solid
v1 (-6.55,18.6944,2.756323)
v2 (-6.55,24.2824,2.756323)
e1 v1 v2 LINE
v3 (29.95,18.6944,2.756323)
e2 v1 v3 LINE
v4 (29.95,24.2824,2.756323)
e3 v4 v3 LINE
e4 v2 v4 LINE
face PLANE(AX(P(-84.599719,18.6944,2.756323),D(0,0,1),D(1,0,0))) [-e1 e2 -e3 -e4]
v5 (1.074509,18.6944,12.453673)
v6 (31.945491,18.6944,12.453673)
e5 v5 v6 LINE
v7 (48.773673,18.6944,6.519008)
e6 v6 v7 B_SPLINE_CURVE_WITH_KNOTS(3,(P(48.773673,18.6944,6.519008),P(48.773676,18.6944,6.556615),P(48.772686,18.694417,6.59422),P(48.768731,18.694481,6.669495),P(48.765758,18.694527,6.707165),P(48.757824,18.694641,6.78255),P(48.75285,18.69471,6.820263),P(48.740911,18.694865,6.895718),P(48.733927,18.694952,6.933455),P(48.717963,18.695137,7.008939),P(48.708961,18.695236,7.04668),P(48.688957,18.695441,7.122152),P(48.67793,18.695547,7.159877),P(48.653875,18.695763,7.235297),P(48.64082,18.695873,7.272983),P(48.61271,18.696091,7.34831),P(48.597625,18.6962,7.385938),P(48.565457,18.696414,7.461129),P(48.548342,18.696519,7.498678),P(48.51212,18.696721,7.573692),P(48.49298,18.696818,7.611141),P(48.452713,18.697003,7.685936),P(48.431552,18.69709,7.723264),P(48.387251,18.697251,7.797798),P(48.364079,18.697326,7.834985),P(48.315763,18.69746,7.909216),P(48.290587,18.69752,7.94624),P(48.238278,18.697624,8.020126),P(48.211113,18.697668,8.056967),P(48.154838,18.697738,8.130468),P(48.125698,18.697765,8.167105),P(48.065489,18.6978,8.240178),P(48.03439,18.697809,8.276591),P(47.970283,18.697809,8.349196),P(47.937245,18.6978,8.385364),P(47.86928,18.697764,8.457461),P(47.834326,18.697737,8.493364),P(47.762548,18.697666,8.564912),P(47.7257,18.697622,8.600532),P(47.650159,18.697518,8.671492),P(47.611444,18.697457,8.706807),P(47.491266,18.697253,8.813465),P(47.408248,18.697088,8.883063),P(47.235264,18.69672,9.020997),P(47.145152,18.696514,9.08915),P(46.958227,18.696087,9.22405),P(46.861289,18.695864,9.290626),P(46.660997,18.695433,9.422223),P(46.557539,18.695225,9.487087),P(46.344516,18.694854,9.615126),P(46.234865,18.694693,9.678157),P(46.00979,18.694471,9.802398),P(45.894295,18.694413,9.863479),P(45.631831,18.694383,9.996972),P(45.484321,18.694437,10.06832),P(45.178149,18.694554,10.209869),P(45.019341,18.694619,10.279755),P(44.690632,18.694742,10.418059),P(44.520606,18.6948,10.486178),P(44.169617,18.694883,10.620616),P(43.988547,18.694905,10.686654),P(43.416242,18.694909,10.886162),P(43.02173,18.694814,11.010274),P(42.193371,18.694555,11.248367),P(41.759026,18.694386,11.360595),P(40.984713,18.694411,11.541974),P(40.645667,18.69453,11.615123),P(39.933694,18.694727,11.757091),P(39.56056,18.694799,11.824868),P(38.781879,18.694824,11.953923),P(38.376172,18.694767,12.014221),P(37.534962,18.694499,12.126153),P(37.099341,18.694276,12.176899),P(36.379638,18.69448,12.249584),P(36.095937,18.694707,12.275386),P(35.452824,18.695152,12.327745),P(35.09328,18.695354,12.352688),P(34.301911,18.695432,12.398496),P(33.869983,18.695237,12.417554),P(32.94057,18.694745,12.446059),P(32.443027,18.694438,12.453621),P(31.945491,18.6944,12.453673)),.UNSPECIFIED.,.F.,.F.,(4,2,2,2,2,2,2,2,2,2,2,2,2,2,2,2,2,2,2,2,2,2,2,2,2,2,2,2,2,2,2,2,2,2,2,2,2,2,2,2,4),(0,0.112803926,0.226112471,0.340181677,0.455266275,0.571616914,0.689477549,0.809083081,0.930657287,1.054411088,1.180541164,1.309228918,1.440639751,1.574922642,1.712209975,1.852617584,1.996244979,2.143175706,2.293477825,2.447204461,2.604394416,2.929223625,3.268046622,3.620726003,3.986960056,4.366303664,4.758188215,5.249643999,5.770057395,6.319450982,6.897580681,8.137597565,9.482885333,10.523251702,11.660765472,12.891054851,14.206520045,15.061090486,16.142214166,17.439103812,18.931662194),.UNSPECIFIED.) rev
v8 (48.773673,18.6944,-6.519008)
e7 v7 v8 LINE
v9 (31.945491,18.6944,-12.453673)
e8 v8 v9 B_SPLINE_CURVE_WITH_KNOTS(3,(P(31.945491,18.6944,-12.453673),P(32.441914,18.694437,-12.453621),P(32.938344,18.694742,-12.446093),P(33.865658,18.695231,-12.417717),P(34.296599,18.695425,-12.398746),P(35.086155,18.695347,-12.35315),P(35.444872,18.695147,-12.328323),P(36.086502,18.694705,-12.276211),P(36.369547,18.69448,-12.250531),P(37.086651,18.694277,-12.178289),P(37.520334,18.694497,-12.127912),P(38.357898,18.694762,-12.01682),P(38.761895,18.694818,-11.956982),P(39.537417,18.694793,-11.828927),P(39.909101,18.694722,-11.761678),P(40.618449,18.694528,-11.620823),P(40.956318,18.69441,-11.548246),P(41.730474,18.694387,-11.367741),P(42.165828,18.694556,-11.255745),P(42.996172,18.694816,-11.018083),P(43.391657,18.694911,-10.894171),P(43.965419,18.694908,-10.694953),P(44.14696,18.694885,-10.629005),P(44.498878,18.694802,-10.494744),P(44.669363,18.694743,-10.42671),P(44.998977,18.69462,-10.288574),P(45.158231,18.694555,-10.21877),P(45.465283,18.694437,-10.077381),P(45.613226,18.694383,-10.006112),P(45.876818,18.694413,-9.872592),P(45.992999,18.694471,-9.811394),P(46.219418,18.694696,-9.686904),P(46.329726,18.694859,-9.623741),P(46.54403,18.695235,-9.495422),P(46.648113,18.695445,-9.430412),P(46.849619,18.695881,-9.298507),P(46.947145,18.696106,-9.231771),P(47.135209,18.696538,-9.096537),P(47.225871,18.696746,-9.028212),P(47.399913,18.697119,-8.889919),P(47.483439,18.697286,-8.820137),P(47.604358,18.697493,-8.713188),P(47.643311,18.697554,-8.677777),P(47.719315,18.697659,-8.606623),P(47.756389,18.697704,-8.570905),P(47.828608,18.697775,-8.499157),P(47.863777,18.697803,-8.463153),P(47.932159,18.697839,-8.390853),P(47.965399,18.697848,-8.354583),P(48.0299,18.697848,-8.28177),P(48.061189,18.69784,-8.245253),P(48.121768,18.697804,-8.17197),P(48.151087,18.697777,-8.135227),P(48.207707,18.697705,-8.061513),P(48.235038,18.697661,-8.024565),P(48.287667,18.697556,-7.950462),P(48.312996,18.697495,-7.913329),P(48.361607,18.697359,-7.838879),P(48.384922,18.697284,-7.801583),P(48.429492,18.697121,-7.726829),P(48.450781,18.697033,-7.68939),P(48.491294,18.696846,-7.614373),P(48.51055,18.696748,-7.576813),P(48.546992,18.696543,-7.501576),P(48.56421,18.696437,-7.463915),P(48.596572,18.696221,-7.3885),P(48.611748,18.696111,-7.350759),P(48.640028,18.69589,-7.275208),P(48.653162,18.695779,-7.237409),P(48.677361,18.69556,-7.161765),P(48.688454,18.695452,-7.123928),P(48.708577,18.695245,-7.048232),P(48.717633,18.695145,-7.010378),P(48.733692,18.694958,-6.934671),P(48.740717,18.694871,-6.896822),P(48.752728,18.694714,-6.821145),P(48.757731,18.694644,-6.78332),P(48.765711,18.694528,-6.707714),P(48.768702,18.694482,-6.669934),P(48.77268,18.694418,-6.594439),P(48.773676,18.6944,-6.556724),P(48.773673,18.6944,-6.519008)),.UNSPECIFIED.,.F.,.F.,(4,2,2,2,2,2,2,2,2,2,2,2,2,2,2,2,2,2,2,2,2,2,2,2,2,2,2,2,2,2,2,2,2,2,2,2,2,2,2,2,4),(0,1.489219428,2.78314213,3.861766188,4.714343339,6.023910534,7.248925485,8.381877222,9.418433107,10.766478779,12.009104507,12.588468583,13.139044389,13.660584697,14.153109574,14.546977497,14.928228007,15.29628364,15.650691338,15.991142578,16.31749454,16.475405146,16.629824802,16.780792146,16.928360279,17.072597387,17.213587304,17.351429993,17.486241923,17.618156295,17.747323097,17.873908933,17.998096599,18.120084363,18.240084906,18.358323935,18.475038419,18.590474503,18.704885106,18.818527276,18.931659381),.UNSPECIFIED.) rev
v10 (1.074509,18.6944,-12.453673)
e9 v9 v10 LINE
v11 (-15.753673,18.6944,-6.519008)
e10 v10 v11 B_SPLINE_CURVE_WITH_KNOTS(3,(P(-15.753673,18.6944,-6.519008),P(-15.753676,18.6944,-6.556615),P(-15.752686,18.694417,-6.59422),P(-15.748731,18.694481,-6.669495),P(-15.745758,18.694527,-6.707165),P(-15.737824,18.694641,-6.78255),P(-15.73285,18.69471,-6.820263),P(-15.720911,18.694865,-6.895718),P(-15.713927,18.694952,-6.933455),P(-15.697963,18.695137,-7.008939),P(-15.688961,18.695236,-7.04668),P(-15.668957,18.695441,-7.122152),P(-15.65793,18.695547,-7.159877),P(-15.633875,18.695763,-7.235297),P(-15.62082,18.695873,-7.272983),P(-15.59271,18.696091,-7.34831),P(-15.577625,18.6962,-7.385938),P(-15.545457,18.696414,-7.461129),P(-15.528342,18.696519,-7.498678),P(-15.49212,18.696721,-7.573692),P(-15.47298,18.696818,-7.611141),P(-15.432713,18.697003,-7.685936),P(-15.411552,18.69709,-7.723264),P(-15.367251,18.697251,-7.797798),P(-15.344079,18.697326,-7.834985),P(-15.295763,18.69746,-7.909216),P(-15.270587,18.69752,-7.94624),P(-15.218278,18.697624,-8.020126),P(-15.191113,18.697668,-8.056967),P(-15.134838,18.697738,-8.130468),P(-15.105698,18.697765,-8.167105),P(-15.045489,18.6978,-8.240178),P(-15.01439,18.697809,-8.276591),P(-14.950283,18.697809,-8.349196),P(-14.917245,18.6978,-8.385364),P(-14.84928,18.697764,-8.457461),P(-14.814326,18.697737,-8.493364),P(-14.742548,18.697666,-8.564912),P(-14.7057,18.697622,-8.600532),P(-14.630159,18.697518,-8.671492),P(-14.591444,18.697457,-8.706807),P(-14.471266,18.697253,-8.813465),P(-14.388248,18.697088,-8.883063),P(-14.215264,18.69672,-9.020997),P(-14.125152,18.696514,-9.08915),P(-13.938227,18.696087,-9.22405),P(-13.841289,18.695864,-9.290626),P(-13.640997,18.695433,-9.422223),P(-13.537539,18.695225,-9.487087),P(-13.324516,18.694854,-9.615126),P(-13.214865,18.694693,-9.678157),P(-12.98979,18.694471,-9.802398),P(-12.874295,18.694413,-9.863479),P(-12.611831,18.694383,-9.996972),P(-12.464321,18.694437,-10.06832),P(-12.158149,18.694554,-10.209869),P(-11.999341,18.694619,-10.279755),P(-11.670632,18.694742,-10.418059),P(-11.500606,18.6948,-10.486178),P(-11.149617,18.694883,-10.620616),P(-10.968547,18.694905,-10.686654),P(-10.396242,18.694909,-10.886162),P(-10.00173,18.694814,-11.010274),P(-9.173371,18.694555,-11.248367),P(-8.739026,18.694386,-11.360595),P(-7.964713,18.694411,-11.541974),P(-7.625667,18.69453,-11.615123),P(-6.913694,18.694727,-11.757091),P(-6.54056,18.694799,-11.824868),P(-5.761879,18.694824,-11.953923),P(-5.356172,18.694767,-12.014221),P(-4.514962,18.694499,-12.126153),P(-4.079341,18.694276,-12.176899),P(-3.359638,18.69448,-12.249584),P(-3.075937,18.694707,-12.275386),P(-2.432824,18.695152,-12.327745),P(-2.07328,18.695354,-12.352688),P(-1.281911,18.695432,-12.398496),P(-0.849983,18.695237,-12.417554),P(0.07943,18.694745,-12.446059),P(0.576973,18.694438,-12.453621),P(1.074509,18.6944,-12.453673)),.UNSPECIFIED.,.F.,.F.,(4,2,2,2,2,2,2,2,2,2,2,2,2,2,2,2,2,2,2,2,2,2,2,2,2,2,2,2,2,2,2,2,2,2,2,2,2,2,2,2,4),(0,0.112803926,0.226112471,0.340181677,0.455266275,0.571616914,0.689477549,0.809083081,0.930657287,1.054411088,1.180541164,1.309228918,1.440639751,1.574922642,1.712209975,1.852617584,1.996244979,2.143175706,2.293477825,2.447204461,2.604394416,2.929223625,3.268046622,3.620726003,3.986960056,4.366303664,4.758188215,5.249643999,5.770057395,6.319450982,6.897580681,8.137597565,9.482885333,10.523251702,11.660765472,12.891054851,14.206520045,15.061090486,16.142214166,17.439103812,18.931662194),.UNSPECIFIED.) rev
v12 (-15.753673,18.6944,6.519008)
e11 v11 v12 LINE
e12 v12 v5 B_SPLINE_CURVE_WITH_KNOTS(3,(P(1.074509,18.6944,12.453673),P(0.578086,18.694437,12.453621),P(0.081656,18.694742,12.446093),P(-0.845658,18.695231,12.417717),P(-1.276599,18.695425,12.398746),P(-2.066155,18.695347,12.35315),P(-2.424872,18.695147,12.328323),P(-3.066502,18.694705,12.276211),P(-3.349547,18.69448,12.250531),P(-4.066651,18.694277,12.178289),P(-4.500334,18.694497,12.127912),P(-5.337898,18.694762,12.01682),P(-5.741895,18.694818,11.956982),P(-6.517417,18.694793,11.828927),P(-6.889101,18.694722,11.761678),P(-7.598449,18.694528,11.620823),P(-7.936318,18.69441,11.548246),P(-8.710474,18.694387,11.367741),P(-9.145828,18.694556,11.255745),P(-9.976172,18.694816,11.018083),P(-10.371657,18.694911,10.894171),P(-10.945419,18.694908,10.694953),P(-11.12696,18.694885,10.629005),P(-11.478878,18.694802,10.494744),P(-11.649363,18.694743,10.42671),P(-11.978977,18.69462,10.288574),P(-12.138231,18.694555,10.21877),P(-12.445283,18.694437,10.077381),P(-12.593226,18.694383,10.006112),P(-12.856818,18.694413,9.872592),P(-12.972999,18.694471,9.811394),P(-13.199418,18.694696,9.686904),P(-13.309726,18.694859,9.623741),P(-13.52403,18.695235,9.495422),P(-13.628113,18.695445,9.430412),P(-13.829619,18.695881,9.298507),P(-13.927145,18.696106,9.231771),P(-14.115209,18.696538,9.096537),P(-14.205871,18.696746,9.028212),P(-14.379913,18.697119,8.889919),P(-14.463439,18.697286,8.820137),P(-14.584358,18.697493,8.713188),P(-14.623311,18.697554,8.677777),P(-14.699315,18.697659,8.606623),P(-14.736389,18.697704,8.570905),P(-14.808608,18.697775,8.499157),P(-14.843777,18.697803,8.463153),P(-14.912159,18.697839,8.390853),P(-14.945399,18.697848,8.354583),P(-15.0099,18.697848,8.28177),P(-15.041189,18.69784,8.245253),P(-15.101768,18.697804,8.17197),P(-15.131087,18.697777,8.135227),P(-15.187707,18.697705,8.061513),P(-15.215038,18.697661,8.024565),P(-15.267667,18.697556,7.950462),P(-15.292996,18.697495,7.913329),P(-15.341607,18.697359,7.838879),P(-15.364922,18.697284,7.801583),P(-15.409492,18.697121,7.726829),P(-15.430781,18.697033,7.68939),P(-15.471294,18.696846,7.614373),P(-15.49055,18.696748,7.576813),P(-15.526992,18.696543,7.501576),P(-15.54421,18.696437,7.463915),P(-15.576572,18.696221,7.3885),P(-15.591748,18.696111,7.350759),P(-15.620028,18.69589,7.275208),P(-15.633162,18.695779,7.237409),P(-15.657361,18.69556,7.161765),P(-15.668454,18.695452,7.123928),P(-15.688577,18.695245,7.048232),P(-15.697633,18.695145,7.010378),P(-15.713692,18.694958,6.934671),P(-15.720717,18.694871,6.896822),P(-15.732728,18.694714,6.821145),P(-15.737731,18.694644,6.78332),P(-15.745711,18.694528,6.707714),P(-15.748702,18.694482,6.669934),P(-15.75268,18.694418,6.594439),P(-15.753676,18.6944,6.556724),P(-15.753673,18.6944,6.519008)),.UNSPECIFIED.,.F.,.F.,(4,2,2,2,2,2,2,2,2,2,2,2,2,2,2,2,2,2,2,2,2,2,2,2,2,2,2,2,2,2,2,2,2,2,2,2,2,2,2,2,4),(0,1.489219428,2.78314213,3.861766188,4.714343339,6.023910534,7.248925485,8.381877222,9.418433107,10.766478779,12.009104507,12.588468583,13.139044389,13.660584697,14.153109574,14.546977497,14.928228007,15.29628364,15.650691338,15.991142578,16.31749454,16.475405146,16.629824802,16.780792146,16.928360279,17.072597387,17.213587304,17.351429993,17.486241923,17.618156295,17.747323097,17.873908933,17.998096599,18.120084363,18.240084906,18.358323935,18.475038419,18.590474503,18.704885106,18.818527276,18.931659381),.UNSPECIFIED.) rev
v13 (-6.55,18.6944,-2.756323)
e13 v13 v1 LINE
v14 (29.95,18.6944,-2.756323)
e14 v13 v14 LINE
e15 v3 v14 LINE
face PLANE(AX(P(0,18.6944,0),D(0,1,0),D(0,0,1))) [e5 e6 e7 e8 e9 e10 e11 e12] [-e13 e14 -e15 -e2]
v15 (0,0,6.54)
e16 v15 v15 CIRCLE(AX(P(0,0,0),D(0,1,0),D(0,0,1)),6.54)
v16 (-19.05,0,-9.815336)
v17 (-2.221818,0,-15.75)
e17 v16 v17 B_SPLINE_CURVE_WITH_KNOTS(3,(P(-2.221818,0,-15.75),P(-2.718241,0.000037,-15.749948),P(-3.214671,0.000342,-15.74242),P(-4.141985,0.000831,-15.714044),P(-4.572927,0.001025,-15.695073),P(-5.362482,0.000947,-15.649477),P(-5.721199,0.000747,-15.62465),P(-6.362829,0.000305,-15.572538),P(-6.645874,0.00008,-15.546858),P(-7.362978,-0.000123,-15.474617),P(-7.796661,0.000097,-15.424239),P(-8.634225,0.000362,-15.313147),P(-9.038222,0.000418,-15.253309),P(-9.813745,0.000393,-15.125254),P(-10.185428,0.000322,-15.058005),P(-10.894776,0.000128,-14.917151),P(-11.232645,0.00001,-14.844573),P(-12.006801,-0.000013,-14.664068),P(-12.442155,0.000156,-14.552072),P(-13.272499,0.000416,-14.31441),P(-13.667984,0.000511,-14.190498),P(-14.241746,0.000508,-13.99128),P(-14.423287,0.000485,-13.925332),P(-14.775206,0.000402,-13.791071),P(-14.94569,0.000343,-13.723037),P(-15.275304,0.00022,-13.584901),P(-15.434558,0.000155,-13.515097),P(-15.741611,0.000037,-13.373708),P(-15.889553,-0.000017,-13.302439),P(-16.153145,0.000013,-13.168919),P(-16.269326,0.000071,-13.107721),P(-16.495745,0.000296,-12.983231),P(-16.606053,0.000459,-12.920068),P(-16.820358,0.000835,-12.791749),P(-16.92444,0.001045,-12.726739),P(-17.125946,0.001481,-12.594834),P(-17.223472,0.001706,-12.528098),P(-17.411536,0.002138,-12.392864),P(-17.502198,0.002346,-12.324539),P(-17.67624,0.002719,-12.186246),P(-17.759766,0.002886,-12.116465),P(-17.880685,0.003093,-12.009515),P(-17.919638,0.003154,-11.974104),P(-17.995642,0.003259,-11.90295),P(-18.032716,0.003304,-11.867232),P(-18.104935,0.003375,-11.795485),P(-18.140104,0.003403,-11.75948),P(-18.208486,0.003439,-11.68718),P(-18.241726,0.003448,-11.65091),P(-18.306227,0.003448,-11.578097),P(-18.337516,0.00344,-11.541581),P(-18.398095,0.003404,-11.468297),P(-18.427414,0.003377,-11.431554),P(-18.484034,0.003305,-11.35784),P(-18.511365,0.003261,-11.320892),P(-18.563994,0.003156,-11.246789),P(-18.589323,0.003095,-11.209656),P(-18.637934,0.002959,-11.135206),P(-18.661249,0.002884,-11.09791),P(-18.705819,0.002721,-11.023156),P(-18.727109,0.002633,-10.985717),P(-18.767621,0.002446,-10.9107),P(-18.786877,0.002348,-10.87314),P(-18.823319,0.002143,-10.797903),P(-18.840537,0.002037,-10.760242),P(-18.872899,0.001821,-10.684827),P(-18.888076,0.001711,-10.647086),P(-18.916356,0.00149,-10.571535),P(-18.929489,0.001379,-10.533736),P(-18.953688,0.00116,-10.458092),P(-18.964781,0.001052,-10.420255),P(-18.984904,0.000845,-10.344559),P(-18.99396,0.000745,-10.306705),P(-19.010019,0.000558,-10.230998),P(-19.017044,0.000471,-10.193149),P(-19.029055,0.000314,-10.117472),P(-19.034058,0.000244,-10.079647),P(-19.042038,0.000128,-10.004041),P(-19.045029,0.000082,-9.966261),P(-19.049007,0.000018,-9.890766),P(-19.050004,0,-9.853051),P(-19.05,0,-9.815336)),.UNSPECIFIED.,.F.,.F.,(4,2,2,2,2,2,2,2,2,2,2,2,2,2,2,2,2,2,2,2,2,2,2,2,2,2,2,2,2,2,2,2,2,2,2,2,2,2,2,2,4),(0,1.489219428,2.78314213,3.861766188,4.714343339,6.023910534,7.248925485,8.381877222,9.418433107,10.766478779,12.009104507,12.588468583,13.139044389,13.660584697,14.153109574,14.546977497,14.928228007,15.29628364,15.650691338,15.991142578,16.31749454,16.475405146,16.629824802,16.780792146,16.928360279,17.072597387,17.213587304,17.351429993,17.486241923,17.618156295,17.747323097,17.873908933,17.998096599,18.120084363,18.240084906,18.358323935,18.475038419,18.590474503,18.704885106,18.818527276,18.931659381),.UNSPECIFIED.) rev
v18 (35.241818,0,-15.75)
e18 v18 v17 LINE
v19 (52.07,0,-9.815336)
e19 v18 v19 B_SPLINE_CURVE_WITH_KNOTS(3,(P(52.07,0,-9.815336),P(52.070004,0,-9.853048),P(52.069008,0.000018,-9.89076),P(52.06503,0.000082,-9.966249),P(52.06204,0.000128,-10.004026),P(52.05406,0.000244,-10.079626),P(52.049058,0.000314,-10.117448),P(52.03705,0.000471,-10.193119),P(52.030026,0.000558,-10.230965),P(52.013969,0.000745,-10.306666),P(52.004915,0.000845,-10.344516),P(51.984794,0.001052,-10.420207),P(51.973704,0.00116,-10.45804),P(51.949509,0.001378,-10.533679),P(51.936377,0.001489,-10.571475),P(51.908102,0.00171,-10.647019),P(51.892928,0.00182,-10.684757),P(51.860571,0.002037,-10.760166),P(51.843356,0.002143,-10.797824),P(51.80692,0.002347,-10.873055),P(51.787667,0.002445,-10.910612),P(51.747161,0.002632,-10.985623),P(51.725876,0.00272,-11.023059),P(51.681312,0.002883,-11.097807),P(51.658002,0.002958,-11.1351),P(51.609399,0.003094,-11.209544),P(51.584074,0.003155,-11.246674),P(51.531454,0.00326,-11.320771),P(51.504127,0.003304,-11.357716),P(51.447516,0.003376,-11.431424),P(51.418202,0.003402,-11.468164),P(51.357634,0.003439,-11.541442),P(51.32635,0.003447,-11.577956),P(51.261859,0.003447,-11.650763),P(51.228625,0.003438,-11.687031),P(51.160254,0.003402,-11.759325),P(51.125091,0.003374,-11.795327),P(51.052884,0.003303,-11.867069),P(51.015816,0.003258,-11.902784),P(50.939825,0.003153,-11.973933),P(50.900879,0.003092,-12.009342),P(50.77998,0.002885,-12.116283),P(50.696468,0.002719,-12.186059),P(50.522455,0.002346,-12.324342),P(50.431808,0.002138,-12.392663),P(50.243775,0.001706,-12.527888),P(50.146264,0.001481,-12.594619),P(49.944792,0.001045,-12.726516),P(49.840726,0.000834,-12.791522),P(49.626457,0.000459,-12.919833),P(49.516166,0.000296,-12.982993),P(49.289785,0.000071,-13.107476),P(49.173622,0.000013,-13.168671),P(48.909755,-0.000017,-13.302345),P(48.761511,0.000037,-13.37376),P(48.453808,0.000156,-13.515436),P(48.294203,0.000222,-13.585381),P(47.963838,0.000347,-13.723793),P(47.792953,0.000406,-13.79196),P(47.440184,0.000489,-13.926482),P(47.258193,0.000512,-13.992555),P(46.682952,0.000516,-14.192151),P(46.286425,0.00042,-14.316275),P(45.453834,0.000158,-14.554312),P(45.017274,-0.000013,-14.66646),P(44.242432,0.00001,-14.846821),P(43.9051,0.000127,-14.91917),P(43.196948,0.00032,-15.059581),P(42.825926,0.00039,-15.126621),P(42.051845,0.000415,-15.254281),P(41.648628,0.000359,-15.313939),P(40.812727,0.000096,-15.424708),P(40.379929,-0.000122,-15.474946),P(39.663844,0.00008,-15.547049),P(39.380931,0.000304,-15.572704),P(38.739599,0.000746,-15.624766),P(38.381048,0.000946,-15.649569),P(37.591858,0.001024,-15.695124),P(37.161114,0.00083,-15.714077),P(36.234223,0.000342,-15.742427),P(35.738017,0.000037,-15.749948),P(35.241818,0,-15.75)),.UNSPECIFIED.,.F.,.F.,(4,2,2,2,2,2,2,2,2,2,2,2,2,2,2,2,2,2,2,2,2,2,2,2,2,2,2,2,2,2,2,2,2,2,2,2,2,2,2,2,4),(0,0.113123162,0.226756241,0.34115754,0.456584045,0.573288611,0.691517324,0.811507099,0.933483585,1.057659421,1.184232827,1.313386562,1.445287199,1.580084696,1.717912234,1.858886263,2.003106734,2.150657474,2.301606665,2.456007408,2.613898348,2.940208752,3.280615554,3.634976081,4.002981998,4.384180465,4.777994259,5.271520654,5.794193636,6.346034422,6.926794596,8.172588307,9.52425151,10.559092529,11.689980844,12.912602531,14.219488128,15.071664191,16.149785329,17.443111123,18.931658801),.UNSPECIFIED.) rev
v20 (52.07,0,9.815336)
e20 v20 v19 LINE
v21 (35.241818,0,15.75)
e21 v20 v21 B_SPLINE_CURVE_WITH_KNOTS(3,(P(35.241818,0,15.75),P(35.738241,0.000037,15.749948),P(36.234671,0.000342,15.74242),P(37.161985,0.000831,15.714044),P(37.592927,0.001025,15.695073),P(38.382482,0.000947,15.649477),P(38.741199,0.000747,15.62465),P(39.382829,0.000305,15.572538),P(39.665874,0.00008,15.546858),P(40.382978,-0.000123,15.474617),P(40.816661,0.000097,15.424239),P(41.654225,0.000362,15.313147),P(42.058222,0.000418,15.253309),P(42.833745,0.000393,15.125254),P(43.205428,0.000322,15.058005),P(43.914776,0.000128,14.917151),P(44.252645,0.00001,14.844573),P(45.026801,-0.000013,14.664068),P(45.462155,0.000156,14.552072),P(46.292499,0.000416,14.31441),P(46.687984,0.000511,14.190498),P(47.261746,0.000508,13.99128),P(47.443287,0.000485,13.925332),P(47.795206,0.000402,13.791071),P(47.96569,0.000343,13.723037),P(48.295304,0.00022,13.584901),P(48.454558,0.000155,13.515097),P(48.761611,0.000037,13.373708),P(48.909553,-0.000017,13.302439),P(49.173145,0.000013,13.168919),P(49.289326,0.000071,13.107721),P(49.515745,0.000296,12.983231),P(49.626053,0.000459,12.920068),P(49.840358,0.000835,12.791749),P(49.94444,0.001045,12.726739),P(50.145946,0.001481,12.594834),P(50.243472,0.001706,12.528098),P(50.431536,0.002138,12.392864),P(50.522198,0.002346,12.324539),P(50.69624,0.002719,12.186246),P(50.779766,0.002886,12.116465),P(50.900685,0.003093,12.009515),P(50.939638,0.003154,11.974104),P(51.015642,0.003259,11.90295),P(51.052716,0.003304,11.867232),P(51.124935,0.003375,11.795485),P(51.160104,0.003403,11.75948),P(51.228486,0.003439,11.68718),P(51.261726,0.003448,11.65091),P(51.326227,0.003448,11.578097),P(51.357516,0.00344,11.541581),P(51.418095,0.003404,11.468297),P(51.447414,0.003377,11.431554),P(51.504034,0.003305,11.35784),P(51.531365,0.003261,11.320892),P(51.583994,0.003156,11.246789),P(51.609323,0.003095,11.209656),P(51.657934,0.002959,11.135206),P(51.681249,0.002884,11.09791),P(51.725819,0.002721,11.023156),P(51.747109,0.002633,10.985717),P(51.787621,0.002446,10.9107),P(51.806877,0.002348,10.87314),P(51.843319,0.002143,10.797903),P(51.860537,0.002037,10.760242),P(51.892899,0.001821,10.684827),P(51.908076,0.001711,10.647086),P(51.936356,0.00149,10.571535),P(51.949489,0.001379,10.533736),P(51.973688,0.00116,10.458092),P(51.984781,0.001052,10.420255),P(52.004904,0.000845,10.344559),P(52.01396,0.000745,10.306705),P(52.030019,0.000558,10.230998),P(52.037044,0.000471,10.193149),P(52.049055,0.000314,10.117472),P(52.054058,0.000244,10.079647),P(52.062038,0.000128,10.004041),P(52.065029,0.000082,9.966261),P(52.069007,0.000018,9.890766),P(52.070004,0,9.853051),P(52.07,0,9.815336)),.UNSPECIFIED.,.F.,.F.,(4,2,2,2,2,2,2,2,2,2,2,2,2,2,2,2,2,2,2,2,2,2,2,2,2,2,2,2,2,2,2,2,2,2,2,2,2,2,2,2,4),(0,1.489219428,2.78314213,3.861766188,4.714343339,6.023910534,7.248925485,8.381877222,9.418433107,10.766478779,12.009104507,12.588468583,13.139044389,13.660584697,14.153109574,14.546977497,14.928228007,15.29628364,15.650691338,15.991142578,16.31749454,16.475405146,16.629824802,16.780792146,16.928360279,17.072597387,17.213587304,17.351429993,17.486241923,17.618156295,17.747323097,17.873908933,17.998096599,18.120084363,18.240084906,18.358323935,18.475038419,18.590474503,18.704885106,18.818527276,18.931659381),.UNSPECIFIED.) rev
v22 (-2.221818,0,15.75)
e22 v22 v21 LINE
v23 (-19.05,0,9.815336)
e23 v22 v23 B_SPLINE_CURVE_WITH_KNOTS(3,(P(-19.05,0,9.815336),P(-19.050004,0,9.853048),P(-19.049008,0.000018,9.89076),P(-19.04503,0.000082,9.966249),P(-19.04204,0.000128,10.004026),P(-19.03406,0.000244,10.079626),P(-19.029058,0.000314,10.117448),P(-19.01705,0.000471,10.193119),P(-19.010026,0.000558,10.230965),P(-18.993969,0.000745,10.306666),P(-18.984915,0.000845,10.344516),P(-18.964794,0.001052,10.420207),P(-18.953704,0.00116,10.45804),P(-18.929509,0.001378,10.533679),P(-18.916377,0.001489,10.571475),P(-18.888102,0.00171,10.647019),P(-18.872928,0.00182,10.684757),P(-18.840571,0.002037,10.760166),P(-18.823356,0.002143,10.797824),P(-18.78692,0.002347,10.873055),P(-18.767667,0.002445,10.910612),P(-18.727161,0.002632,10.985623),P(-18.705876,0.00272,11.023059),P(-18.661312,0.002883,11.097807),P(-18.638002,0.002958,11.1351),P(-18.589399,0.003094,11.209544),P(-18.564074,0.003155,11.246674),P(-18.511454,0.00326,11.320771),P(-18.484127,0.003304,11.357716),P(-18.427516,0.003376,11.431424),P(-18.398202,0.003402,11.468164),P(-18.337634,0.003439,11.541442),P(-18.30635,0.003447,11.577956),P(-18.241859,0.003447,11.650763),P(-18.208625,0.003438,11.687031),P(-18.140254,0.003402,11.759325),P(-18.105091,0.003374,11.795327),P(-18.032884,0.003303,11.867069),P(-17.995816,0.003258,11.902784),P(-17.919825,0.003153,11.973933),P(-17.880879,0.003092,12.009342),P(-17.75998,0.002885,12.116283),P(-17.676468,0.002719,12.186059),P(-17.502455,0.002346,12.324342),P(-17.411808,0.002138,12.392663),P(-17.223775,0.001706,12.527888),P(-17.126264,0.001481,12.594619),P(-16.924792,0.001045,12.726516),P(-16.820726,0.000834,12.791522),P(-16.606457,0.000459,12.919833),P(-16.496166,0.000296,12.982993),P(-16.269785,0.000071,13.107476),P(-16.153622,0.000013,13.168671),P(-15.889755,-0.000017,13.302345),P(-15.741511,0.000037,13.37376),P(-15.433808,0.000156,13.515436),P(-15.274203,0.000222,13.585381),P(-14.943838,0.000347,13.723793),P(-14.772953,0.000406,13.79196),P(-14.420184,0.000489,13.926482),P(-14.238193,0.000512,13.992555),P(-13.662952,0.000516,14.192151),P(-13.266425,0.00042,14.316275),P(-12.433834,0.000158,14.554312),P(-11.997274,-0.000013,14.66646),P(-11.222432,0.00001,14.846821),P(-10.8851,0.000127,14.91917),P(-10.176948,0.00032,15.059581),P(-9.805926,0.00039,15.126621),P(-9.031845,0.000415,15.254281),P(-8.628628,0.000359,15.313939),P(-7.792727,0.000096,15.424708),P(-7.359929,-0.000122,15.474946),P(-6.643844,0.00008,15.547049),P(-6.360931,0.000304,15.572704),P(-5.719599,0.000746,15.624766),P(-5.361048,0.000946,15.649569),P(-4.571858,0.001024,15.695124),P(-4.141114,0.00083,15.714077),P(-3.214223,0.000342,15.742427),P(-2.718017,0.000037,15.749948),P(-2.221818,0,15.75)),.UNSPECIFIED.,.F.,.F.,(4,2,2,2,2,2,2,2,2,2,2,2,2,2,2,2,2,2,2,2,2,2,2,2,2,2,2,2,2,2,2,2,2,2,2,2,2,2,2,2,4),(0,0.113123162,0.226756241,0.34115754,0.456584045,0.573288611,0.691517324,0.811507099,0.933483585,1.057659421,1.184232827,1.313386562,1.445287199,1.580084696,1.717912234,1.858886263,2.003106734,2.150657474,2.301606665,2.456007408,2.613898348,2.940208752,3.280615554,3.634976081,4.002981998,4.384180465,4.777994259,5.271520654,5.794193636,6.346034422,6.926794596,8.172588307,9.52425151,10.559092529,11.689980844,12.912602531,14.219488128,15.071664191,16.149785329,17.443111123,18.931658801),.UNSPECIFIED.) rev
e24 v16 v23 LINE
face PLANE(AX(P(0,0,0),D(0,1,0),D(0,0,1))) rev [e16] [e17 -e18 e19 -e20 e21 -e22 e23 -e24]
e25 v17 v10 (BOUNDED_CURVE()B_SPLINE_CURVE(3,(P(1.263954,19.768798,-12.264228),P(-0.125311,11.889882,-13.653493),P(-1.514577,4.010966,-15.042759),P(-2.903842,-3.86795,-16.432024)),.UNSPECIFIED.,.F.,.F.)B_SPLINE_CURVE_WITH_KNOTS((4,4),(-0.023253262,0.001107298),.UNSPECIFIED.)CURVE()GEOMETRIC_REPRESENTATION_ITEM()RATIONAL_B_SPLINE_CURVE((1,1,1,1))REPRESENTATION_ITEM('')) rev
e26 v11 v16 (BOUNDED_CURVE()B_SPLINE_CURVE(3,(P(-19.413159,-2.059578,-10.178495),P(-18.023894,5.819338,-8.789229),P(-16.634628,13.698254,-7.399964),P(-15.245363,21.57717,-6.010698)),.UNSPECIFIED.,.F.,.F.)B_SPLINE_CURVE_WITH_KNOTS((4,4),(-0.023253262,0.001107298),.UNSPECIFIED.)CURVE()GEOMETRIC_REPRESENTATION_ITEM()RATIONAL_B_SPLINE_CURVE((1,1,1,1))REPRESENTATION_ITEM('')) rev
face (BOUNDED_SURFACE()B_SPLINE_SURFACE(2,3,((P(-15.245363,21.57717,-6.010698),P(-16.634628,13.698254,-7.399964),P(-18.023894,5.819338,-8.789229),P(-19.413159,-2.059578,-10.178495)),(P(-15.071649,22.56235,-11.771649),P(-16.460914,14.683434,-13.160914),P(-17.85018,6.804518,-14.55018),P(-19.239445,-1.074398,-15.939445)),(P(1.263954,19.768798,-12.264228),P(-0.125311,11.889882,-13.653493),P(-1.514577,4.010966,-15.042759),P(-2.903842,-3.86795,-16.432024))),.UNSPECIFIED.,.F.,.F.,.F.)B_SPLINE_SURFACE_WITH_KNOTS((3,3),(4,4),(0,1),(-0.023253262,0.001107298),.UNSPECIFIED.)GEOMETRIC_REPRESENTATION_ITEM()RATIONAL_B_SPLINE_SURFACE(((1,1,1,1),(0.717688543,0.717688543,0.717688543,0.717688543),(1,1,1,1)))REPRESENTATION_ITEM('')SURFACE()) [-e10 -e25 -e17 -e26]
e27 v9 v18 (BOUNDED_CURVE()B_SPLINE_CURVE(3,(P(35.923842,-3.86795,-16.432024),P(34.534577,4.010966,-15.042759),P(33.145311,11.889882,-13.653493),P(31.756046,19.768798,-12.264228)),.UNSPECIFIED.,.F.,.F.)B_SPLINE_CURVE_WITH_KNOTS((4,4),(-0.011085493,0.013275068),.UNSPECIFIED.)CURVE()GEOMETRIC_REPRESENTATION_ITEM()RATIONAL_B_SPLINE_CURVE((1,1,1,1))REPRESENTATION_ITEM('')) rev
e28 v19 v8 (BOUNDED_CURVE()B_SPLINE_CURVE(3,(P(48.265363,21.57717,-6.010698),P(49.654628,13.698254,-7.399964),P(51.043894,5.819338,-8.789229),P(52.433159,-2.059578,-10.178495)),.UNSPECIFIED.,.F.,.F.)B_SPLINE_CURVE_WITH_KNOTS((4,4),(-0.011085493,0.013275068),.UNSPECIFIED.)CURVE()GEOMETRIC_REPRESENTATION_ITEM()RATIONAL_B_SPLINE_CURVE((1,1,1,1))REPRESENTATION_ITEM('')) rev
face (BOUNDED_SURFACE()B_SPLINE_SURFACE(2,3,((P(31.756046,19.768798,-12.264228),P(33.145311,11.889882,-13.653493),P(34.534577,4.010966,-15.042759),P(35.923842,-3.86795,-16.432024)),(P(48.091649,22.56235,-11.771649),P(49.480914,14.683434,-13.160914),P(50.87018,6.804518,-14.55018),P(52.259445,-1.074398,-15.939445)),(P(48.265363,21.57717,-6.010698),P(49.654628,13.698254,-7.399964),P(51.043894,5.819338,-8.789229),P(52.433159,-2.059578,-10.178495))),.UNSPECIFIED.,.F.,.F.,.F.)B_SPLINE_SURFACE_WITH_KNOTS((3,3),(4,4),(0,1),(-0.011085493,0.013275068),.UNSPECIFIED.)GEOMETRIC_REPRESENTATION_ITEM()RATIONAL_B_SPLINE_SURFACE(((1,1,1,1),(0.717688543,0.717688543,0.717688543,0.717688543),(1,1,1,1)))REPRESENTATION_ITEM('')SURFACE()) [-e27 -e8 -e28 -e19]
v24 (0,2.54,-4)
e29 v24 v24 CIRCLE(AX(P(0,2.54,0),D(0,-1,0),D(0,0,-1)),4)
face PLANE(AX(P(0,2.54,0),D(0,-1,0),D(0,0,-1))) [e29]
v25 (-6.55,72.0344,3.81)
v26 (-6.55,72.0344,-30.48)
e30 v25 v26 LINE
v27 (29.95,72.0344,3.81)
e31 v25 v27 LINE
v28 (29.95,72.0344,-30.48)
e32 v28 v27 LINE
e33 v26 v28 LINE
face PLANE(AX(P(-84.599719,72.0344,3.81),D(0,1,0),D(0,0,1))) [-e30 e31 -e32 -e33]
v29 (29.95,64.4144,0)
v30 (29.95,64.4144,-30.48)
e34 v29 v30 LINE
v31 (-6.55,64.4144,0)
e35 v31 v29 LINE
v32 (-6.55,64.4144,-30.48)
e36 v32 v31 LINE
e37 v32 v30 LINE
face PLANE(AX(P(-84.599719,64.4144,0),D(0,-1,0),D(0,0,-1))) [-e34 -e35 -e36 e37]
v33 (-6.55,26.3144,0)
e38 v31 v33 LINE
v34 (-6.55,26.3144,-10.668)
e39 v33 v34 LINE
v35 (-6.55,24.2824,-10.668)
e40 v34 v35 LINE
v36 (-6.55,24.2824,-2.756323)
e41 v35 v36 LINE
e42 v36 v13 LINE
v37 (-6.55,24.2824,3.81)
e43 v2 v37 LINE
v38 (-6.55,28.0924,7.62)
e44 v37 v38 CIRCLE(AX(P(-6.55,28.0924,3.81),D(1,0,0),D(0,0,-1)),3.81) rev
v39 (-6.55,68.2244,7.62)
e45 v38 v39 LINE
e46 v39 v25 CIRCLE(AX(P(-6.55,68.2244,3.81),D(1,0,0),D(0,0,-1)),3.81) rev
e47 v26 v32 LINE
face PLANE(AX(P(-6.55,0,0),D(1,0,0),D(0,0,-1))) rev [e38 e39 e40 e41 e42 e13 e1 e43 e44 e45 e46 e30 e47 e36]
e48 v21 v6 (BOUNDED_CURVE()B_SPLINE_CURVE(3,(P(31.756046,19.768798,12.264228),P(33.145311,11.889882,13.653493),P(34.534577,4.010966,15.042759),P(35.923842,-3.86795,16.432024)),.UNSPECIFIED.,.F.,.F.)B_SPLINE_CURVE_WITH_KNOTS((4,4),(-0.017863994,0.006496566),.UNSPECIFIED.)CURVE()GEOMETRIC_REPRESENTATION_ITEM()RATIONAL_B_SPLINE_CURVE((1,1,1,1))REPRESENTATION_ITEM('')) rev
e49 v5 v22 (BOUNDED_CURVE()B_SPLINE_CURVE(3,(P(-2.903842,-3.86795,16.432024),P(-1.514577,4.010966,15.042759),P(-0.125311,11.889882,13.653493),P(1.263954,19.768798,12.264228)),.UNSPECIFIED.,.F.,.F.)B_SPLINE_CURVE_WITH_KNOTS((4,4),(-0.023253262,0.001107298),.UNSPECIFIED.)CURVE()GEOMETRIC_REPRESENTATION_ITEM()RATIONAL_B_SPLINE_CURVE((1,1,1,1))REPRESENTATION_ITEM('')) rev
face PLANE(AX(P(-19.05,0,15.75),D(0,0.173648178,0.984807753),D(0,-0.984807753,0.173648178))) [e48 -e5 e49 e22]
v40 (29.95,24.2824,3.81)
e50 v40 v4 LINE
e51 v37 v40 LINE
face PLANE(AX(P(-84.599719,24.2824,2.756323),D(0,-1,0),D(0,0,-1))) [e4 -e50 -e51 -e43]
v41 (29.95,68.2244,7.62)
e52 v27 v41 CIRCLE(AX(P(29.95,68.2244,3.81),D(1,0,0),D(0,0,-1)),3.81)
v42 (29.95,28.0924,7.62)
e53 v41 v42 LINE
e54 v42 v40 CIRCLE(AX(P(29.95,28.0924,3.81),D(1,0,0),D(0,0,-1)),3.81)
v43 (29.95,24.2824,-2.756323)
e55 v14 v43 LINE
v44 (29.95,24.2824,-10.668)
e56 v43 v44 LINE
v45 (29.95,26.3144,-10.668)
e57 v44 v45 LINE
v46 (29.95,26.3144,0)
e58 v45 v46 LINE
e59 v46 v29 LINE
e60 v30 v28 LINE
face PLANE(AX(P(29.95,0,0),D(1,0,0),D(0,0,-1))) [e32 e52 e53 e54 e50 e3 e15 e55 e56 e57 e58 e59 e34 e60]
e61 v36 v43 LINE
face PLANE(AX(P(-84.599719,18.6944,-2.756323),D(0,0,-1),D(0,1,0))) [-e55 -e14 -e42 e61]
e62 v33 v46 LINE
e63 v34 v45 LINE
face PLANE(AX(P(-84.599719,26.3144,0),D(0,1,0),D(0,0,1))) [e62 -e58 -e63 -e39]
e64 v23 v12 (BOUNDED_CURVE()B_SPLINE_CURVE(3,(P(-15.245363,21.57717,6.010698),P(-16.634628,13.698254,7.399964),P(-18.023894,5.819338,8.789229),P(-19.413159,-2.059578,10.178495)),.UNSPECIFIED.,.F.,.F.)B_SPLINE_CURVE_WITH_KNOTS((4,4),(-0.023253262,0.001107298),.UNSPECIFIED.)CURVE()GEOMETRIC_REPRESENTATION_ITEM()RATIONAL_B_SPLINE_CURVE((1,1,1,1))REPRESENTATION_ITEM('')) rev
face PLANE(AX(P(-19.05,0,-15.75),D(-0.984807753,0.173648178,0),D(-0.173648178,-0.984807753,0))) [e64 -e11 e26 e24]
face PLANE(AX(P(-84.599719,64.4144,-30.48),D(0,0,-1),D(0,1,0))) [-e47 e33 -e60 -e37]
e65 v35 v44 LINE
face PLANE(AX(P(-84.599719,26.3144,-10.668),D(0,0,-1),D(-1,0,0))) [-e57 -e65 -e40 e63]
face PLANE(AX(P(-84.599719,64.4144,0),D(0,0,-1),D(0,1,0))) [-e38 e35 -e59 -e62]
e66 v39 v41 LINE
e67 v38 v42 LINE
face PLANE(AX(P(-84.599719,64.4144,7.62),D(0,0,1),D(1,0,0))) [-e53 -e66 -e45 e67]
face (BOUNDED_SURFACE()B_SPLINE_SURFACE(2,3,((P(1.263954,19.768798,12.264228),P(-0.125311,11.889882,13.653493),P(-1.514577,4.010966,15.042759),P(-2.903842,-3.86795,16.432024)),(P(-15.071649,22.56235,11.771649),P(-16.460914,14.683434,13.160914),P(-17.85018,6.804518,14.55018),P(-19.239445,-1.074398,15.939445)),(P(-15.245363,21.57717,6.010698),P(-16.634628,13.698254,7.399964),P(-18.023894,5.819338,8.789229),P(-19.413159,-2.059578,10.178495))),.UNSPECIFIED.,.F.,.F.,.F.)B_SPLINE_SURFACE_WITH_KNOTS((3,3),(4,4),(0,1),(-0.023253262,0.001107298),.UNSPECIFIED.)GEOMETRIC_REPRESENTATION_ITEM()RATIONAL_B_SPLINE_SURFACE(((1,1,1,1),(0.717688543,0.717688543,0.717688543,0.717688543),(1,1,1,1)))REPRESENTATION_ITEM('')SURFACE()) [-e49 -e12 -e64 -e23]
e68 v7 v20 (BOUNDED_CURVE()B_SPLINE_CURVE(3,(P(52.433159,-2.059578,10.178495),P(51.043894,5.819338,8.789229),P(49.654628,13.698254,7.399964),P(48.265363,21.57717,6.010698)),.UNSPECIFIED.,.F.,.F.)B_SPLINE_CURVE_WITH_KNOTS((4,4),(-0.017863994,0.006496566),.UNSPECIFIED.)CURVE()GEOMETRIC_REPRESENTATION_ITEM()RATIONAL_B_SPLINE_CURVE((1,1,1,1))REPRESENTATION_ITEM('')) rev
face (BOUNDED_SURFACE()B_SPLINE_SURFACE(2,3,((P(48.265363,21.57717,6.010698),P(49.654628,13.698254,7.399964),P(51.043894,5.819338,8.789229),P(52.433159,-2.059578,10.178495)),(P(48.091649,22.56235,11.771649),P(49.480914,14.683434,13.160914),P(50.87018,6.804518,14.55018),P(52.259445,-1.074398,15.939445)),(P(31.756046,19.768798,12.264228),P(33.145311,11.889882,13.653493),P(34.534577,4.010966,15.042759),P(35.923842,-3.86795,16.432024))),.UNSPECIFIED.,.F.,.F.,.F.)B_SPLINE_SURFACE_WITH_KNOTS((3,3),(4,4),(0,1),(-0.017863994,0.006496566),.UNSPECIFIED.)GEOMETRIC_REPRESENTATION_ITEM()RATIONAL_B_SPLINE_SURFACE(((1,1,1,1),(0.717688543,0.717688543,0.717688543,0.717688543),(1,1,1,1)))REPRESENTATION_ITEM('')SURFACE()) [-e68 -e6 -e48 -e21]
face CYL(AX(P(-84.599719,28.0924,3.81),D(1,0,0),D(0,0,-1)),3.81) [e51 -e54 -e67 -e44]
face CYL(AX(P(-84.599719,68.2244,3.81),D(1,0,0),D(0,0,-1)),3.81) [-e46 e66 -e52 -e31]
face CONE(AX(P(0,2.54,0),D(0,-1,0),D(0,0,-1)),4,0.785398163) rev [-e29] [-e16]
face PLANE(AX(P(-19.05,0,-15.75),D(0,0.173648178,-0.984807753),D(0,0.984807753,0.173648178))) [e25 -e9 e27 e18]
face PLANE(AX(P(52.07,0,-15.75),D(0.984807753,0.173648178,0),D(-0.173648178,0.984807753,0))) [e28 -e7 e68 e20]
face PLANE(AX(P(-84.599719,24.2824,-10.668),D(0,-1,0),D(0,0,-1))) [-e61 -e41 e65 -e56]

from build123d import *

# Parameters (mm, degrees)
SKETCH1_W           = 71.12
SKETCH1_H           = 31.5
BOSS_EXTRUDE1_DEPTH = 18.6944
BOSS_EXTRUDE1_TAPER = 10
SKETCH3_R           = 4
CUT_EXTRUDE1_DEPTH  = 2.54
CHAMFER1_SIZE       = 2.54
BOSS_EXTRUDE2_DEPTH = 6.55
BOSS_EXTRUDE3_START = 29.95
BOSS_EXTRUDE3_DEPTH = 29.95


# Some blends are built 0.0001 mm under size
with BuildPart() as part:
    # Sketch1 → Boss-Extrude1 (new body)
    with BuildSketch(Plane(origin=(0, 0, 0), x_dir=(1, 0, 0), z_dir=(0, 1, 0))):
        with Locations((16.51, 0)):
            Rectangle(SKETCH1_W, SKETCH1_H)
    extrude(amount=BOSS_EXTRUDE1_DEPTH, taper=BOSS_EXTRUDE1_TAPER)

    # Fillet1
    # an asymmetric fillet: 16.764, 6.35 mm, written as the material it takes off along each edge
    with BuildSketch(Plane(origin=(59.161619342, -40.218571846, 22.841619342), x_dir=(-0.985255774317392, -0.16848866057223846, 0.029709096802316298), z_dir=(-0.1710878697460354, 0.9702875252478138, -0.17108786974603588))) as fillet1_piece_1:
        with BuildLine():
            Bezier((16.580063455, 0), (0, 0), (-0.17631352, -5.844503547), weights=[1, 0.717688543, 1])
            Line((-0.17631352, -5.844503547), (0, 0))
            Line((0, 0), (16.580063455, 0))
        make_face()
    extrude(amount=102.167183553, mode=Mode.SUBTRACT)
    with BuildSketch(Plane(origin=(-26.141619342, -40.218571846, -22.841619342), x_dir=(-0.029709096802316662, -0.16848866057223877, 0.9852557743173919), z_dir=(0.1710878697460356, 0.9702875252478138, 0.1710878697460358))) as fillet1_piece_2:
        with BuildLine():
            Bezier((5.847162404, 0), (0, 0), (-0.499950087, 16.572524071), weights=[1, 0.717688543, 1])
            Line((-0.499950087, 16.572524071), (0, 0))
            Line((0, 0), (5.847162404, 0))
        make_face()
    extrude(amount=102.167183553, mode=Mode.SUBTRACT)
    with BuildSketch(Plane(origin=(59.161619342, -40.218571846, -22.841619342), x_dir=(0.029709096802316877, -0.16848866057223874, 0.9852557743173919), z_dir=(-0.1710878697460358, 0.9702875252478138, 0.1710878697460358)), Plane(origin=(-26.141619342, -40.218571846, 22.841619342), x_dir=(-0.029709096802316284, -0.16848866057223885, -0.9852557743173919), z_dir=(0.1710878697460356, 0.9702875252478138, -0.1710878697460358))) as fillet1_piece_3:
        with BuildLine():
            Bezier((5.847162404, 0), (0, 0), (-0.499950087, -16.572524071), weights=[1, 0.717688543, 1])
            Line((-0.499950087, -16.572524071), (0, 0))
            Line((0, 0), (5.847162404, 0))
        make_face()
    extrude(amount=102.167183553, mode=Mode.SUBTRACT)

    # Sketch3 → Cut-Extrude1 (cut)
    with BuildSketch(Plane.XZ):
        with Locations(Location((0, 0, 0), (0, 0, 270))):
            Circle(SKETCH3_R)
    extrude(amount=-CUT_EXTRUDE1_DEPTH, mode=Mode.SUBTRACT)

    # Chamfer1
    chamfer1_edges = [part.edges().sort_by_distance(p)[0] for p in [
        (0, 0, 4),
    ]]
    chamfer(chamfer1_edges, length=CHAMFER1_SIZE - 0.0001)  # a hair under: the kernel refuses the full size

    # Sketch4 → Boss-Extrude2 (add)
    with BuildSketch(Plane(origin=(0, 0, 0), x_dir=(0, 0, -1), z_dir=(1, 0, 0))):
        with BuildLine():
            Line((30.48, 64.4144), (30.48, 72.0344))
            Line((30.48, 72.0344), (-3.81, 72.0344))
            ThreePointArc((-3.81, 72.0344), (-6.504076836, 70.918476836), (-7.62, 68.2244))
            Line((-7.62, 68.2244), (-7.62, 64.4144))
            Line((-7.62, 64.4144), (-7.62, 28.0924))
            ThreePointArc((-7.62, 28.0924), (-6.504076836, 25.398323164), (-3.81, 24.2824))
            Line((-3.81, 24.2824), (-2.756322634, 24.2824))
            Line((-2.756322634, 24.2824), (-2.756322634, 18.6944))
            Line((-2.756322634, 18.6944), (2.756322634, 18.6944))
            Line((2.756322634, 18.6944), (2.756322634, 24.2824))
            Line((2.756322634, 24.2824), (10.668, 24.2824))
            Line((10.668, 24.2824), (10.668, 26.3144))
            Line((10.668, 26.3144), (0, 26.3144))
            Line((0, 26.3144), (0, 64.4144))
            Line((0, 64.4144), (30.48, 64.4144))
        make_face()
    extrude(amount=-BOSS_EXTRUDE2_DEPTH)

    # Sketch5 → Boss-Extrude3 (add)
    with BuildSketch(Plane(origin=(0, 0, 0), x_dir=(0, 0, -1), z_dir=(1, 0, 0)).offset(BOSS_EXTRUDE3_START)):
        with BuildLine():
            Line((-7.62, 68.2244), (-7.62, 28.0924))
            ThreePointArc((-7.62, 28.0924), (-6.504076836, 25.398323164), (-3.81, 24.2824))
            Line((-3.81, 24.2824), (-2.756322634, 24.2824))
            Line((-2.756322634, 24.2824), (-2.756322634, 18.6944))
            Line((-2.756322634, 18.6944), (2.756322634, 18.6944))
            Line((2.756322634, 18.6944), (2.756322634, 24.2824))
            Line((2.756322634, 24.2824), (10.668, 24.2824))
            Line((10.668, 24.2824), (10.668, 26.3144))
            Line((10.668, 26.3144), (0, 26.3144))
            Line((0, 26.3144), (0, 64.4144))
            Line((0, 64.4144), (30.48, 64.4144))
            Line((30.48, 64.4144), (30.48, 72.0344))
            Line((30.48, 72.0344), (-3.81, 72.0344))
            ThreePointArc((-3.81, 72.0344), (-6.504076836, 70.918476836), (-7.62, 68.2244))
        make_face()
    extrude(amount=-BOSS_EXTRUDE3_DEPTH)


solid = part.part
